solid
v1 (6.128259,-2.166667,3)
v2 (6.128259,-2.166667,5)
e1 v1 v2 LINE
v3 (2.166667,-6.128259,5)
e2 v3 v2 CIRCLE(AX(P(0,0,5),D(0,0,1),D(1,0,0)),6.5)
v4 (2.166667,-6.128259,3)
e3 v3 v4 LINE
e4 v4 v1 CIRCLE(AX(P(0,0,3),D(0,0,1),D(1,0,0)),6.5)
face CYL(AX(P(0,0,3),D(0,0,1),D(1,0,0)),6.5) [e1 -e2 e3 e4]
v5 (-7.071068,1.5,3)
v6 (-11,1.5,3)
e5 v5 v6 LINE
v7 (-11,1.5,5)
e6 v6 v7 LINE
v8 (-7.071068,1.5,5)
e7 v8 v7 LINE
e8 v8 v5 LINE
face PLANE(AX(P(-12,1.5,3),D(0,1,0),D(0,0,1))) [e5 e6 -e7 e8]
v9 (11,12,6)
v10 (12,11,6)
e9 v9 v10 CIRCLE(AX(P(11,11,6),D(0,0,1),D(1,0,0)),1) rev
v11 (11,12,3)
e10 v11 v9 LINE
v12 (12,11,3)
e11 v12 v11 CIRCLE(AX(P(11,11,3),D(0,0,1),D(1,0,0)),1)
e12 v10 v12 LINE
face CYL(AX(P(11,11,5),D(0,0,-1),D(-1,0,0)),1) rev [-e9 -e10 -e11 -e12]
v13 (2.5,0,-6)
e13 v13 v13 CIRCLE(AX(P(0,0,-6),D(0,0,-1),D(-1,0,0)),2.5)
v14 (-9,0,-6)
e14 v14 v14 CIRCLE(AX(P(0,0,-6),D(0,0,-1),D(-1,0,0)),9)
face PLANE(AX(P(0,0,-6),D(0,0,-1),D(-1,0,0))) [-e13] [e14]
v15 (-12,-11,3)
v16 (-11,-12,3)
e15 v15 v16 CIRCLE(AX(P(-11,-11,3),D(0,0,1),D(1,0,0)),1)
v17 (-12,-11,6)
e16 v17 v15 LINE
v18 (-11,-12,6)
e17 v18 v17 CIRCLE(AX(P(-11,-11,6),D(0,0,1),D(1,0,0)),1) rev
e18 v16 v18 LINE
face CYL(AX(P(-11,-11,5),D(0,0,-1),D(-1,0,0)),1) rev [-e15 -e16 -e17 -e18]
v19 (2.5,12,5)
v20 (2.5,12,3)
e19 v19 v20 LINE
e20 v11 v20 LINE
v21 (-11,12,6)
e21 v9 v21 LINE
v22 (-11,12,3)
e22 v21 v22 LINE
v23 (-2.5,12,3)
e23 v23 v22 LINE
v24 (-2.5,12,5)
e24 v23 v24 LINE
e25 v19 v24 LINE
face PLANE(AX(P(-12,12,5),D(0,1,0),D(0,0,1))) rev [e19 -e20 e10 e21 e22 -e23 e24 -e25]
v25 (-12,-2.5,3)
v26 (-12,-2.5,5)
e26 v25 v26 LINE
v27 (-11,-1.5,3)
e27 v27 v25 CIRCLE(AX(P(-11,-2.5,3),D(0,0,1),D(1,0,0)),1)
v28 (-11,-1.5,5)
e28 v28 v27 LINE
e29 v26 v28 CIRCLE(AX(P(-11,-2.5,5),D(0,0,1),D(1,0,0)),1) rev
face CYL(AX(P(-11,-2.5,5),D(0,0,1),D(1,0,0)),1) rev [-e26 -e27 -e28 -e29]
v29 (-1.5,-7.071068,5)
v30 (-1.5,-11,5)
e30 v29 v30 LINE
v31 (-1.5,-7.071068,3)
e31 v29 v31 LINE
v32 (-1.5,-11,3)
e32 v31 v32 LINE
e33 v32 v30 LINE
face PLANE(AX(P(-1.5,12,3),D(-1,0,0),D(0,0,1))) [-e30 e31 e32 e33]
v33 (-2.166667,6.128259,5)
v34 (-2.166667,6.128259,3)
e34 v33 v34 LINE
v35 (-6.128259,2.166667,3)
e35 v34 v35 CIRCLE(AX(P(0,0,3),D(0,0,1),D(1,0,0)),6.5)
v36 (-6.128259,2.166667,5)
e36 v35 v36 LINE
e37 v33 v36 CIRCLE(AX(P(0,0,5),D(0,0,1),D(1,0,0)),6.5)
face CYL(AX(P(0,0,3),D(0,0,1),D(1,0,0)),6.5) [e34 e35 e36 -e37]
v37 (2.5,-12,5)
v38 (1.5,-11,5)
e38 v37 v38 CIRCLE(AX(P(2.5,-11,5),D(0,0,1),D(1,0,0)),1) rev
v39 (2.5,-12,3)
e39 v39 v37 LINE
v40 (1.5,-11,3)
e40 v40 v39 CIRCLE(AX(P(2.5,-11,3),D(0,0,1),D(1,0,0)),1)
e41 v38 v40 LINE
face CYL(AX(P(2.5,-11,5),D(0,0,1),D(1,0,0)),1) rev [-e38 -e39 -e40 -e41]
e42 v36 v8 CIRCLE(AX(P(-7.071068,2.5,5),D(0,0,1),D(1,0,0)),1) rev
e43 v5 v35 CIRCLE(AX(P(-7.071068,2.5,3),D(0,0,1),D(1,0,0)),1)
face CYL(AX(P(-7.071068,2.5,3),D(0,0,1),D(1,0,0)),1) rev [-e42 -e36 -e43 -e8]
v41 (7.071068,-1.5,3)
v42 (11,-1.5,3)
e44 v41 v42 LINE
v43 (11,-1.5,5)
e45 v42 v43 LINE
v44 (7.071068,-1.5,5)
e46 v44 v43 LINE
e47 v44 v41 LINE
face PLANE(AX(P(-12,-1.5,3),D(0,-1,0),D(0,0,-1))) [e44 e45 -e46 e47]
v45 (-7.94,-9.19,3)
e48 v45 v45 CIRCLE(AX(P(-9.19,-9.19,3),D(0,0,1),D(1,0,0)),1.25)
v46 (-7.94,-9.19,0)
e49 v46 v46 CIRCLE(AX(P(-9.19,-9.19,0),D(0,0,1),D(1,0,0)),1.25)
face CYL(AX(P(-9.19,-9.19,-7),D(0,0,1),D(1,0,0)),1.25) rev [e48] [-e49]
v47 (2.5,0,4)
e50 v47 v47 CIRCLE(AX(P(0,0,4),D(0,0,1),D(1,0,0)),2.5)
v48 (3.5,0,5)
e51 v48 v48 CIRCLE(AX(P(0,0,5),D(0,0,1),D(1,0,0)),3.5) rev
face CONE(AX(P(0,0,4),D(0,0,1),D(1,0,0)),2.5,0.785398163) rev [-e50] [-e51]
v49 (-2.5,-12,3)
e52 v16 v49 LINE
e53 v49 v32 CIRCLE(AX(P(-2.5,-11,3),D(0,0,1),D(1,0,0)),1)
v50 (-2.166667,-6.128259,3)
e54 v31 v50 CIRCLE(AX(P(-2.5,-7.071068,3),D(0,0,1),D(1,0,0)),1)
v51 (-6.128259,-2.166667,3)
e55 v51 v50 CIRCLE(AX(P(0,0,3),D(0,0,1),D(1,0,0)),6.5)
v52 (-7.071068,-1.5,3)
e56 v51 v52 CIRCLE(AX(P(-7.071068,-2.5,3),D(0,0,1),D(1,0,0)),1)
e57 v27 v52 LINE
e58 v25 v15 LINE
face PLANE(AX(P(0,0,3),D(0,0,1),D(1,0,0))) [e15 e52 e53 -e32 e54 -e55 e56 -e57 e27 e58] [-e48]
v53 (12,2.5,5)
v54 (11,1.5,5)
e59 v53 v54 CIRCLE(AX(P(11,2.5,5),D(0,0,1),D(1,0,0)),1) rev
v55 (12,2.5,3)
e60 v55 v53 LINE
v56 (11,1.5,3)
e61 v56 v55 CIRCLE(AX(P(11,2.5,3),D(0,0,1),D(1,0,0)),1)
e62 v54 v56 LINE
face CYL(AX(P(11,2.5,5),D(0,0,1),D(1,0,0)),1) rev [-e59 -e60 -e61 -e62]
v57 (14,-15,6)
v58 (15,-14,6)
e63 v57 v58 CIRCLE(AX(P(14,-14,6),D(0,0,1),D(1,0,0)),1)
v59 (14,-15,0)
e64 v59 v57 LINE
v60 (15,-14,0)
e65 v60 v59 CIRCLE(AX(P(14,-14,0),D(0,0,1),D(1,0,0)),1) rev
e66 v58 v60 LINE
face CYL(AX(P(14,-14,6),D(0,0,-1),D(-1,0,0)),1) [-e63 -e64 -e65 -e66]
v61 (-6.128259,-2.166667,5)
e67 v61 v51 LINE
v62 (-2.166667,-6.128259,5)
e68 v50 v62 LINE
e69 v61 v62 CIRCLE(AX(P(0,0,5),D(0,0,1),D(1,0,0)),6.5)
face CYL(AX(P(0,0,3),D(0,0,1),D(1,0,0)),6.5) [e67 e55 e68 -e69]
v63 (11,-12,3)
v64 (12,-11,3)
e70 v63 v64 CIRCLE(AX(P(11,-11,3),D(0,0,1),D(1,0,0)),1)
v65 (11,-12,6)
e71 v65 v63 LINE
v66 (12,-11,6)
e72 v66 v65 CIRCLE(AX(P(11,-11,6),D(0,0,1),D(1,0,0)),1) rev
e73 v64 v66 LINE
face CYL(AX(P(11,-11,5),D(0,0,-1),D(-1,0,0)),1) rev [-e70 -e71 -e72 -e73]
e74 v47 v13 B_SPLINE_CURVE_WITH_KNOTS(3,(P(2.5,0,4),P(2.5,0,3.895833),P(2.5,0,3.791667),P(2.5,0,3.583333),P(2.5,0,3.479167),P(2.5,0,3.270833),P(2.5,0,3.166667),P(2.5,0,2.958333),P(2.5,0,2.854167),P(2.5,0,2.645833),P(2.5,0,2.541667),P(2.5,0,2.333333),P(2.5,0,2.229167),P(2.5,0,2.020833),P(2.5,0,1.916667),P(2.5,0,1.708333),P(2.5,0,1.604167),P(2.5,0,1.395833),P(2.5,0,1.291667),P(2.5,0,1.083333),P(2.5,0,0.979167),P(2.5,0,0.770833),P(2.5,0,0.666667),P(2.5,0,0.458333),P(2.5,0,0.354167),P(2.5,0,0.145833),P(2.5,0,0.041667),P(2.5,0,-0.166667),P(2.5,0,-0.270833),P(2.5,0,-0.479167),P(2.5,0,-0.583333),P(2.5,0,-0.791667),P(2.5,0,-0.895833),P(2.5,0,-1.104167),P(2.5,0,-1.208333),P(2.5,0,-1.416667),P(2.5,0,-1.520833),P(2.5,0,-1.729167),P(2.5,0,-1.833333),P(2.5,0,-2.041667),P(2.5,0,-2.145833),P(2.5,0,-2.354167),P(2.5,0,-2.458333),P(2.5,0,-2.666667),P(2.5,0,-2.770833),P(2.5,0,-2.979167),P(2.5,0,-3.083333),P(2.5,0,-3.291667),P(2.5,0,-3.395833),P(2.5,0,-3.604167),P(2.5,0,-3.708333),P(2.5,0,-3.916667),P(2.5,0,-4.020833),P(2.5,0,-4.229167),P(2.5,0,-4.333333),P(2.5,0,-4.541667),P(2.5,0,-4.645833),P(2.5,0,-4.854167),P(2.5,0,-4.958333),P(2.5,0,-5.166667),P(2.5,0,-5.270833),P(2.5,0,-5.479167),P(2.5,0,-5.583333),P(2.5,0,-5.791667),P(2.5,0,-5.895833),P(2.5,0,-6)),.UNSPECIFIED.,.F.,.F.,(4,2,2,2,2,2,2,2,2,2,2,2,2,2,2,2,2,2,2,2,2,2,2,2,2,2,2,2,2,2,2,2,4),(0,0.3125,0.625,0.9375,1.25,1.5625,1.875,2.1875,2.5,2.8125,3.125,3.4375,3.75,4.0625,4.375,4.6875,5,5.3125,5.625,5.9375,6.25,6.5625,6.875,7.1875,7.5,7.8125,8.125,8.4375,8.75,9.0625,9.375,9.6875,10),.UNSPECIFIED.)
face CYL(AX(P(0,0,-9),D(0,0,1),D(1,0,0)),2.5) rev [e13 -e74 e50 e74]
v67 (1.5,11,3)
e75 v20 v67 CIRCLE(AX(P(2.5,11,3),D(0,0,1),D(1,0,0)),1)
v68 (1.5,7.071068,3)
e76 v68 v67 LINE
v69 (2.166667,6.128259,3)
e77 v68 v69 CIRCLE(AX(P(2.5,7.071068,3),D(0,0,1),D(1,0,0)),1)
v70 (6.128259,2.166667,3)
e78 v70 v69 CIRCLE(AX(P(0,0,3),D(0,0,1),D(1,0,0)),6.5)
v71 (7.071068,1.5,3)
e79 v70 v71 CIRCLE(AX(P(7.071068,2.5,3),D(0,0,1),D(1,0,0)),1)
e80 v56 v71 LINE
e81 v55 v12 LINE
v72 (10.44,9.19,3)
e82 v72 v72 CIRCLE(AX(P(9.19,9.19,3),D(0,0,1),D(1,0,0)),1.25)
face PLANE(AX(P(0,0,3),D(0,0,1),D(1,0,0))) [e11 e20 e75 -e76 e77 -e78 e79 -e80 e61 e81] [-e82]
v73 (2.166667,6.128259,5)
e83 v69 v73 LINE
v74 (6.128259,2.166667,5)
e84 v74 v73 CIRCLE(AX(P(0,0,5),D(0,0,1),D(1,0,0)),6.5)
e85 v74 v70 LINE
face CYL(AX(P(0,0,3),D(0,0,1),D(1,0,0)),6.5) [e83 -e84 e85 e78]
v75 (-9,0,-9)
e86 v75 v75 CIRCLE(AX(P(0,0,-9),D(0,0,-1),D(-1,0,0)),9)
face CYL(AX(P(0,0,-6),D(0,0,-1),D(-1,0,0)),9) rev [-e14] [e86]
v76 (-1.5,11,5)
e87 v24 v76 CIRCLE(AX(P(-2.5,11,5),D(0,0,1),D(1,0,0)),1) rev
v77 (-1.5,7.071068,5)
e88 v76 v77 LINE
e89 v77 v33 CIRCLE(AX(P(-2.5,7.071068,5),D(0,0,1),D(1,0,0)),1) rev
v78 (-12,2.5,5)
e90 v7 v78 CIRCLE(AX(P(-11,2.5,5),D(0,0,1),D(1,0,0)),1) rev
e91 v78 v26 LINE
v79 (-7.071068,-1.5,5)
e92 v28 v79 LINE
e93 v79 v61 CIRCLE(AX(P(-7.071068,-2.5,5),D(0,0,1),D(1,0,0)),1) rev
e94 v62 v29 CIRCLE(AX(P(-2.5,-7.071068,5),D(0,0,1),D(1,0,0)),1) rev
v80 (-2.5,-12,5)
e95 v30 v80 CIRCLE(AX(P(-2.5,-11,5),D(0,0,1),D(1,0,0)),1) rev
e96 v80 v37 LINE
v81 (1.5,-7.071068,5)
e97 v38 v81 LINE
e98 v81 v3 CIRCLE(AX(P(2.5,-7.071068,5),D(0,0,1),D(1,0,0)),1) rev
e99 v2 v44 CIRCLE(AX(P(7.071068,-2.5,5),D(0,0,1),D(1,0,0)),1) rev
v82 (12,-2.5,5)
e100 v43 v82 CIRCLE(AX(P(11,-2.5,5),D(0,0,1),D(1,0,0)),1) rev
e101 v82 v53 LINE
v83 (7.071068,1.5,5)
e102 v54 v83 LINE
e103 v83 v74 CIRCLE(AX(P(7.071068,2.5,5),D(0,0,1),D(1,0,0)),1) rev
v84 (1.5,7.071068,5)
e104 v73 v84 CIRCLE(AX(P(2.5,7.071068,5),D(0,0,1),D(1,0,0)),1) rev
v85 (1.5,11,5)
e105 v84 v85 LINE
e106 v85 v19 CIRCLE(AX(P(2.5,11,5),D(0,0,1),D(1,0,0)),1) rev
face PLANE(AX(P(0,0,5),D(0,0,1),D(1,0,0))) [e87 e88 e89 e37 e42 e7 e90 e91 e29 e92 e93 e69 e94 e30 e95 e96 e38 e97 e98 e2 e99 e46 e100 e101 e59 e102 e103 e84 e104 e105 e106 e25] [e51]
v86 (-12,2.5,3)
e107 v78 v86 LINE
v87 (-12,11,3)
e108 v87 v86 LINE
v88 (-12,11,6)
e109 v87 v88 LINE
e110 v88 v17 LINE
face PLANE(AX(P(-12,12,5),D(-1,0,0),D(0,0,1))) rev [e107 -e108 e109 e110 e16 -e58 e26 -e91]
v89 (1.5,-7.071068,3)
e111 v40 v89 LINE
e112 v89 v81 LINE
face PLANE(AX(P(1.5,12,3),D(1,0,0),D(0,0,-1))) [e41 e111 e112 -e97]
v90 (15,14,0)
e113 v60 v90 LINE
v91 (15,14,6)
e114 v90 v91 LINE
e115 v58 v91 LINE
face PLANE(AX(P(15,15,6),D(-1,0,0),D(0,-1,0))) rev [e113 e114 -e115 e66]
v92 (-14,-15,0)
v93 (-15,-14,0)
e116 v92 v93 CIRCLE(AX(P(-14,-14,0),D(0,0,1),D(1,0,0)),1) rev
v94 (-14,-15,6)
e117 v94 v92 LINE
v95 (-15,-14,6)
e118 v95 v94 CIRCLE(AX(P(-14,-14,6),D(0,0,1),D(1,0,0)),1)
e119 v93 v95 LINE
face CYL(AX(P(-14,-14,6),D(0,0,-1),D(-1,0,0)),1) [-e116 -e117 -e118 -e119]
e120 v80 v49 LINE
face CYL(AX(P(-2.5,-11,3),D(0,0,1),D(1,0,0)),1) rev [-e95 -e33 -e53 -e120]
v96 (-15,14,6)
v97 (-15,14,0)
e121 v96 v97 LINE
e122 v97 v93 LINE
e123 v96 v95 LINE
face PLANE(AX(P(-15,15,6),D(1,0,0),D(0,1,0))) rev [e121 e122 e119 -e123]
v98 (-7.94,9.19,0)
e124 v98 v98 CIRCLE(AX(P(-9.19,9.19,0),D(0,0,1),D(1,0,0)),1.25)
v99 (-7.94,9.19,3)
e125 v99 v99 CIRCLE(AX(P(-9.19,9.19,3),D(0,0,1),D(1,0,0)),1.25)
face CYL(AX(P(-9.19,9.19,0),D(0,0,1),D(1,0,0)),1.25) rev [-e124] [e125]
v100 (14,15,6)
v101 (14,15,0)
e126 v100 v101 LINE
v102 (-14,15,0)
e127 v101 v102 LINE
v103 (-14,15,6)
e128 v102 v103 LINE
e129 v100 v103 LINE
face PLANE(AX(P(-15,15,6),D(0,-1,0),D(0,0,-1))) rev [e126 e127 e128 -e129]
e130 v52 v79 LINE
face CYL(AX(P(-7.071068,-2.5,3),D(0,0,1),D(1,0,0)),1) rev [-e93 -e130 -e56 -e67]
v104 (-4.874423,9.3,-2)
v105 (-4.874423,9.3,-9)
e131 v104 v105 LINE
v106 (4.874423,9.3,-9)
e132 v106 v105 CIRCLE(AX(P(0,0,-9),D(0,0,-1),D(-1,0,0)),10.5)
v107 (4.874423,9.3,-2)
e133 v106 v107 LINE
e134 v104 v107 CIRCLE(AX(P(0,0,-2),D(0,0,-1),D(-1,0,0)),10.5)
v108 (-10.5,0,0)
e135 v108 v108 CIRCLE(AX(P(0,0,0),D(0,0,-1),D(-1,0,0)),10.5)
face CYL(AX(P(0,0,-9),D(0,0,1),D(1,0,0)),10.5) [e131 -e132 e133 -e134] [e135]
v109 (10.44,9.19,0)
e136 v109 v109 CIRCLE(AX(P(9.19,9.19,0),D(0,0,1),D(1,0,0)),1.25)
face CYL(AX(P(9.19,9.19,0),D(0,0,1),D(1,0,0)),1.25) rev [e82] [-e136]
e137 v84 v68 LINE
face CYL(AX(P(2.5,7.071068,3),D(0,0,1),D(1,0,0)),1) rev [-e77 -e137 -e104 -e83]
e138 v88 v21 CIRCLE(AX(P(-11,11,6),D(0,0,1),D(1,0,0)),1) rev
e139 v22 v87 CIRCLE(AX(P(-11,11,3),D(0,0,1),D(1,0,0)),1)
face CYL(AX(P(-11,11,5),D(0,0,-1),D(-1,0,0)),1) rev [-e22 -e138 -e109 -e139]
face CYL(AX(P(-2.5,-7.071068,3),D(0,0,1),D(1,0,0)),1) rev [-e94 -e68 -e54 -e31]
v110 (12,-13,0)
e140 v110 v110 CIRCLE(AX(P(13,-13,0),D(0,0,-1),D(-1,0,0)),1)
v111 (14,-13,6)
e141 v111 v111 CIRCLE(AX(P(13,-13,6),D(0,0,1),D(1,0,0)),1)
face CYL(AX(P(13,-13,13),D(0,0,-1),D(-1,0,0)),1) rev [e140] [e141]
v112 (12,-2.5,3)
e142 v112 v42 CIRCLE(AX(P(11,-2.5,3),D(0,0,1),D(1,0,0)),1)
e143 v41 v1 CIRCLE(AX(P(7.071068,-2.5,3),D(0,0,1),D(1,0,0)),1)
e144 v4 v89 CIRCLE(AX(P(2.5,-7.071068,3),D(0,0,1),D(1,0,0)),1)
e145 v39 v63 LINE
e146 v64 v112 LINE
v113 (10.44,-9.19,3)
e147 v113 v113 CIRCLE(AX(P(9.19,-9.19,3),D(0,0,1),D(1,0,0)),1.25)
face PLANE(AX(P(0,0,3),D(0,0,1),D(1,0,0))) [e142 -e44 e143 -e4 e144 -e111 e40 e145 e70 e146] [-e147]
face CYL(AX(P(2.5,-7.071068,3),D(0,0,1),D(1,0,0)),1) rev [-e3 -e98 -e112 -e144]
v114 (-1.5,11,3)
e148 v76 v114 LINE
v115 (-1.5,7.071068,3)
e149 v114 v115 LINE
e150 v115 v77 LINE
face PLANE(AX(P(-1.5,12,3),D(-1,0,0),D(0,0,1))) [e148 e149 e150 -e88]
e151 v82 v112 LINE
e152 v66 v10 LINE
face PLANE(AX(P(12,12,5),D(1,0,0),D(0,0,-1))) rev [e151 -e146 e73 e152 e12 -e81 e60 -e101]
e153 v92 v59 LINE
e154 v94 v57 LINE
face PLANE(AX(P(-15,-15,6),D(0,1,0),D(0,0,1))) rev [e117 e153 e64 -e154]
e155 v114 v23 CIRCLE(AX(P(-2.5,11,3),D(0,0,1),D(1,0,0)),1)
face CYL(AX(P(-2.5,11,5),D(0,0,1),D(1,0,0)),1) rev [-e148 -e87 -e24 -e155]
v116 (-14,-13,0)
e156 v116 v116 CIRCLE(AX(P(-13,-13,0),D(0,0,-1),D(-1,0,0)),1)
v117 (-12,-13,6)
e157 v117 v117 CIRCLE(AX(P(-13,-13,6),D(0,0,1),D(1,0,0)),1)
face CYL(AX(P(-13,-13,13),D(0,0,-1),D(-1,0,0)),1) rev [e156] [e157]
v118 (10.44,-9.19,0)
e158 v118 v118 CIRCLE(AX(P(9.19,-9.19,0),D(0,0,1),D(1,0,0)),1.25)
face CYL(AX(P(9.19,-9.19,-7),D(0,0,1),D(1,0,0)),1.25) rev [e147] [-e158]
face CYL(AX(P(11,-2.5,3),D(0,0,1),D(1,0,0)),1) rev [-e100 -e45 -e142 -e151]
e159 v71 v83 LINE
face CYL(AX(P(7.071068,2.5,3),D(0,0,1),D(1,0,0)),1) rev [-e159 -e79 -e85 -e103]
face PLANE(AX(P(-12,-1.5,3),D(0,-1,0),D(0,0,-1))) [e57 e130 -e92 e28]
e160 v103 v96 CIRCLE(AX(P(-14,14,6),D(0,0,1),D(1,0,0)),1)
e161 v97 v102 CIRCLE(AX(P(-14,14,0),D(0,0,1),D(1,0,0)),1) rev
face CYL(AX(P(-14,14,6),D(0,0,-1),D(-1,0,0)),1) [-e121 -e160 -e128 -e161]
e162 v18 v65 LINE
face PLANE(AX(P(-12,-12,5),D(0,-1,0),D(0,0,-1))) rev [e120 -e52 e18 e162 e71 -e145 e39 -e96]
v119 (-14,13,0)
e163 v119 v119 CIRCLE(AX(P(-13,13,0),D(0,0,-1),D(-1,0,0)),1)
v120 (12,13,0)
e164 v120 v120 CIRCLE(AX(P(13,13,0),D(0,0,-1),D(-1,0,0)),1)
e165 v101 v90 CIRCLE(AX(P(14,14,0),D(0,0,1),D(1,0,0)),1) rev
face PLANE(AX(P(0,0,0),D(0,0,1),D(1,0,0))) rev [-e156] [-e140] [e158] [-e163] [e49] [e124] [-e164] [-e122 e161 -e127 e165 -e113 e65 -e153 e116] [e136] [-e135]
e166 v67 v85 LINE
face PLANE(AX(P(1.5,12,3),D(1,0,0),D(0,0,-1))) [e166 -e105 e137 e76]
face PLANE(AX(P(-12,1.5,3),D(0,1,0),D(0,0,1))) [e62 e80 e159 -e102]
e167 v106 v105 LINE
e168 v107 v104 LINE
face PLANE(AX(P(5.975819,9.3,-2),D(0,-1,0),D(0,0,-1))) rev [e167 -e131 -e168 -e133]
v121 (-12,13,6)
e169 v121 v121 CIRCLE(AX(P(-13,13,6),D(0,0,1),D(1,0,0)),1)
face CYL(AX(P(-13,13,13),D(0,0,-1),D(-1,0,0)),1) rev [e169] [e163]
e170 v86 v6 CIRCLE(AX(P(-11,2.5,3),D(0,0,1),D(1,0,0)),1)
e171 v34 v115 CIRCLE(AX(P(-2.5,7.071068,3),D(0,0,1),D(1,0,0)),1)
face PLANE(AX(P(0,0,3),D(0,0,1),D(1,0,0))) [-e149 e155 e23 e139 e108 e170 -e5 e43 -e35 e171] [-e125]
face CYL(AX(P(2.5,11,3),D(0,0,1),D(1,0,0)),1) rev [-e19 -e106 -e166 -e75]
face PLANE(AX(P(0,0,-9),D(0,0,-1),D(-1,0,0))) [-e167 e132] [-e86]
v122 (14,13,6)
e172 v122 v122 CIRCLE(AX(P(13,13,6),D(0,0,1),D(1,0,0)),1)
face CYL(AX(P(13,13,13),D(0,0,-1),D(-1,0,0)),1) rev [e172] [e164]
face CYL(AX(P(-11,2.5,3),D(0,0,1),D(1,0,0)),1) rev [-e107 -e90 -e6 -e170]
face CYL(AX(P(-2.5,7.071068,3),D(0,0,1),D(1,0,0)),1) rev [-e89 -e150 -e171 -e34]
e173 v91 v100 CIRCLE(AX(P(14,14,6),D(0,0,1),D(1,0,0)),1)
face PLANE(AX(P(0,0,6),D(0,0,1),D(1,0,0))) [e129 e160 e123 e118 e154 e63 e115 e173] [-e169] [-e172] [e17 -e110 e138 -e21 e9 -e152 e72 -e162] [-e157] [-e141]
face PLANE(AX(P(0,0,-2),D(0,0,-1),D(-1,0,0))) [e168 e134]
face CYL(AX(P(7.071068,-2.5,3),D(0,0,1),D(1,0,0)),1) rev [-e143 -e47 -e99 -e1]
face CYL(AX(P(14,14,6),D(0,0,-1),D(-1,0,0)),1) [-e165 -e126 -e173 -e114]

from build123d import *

# Parameters (mm, degrees)
SKETCH2_W              = 30
SKETCH2_H              = 30
BOSS_EXTRUDE1_DEPTH    = 6
CUT_EXTRUDE1_START     = -1
CUT_EXTRUDE1_OUTLINE_W = 24
CUT_EXTRUDE1_OUTLINE_H = 24
CUT_EXTRUDE1_DEPTH     = 1
SKETCH4_W              = 24
SKETCH4_H              = 24
SKETCH4_R              = 6.5
CUT_EXTRUDE2_DEPTH     = 2
SKETCH5_W              = 3
SKETCH5_H              = 24
BOSS_EXTRUDE2_DEPTH    = 2
SKETCH6_W              = 24
SKETCH6_H              = 3
BOSS_EXTRUDE3_DEPTH    = 2
FILLET1_R              = 1
FILLET2_R              = 1
SKETCH8_R              = 1.25
CUT_EXTRUDE3_DEPTH     = 10
SKETCH7_R              = 1.25
CUT_EXTRUDE4_DEPTH     = 6
FILLET3_R              = 1
SKETCH10_R             = 10.5
BOSS_EXTRUDE4_DEPTH    = 9
SKETCH11_R             = 9
CUT_EXTRUDE5_DEPTH     = 3
SKETCH9_R              = 2.5
CUT_EXTRUDE6_DEPTH     = 26.416530054
SKETCH12_R             = 1
CUT_EXTRUDE7_DEPTH     = 13
SKETCH13_W             = 15.514513233
SKETCH13_H             = 2.095553254
CUT_EXTRUDE9_DEPTH     = 7
CHAMFER1_SIZE          = 1


# Read off the part's stored shape, not the designer's step: Cut-Extrude1
with BuildPart() as part:
    # Sketch2 → Boss-Extrude1 (new body)
    with BuildSketch(Plane.XY):
        Rectangle(SKETCH2_W, SKETCH2_H)
    extrude(amount=BOSS_EXTRUDE1_DEPTH)

    # Cut-Extrude1 outline → Cut-Extrude1 (cut)
    with BuildSketch(Plane.XY.offset(6).offset(CUT_EXTRUDE1_START)):
        Rectangle(CUT_EXTRUDE1_OUTLINE_W, CUT_EXTRUDE1_OUTLINE_H)
    extrude(amount=CUT_EXTRUDE1_DEPTH, mode=Mode.SUBTRACT)

    # Sketch4 → Cut-Extrude2 (cut)
    with BuildSketch(Plane.XY.offset(5)):
        Rectangle(SKETCH4_W, SKETCH4_H)
        Circle(SKETCH4_R, mode=Mode.SUBTRACT)
    extrude(amount=-CUT_EXTRUDE2_DEPTH, mode=Mode.SUBTRACT)

    # Sketch5 → Boss-Extrude2 (add)
    with BuildSketch(Plane.XY.offset(5)):
        Rectangle(SKETCH5_W, SKETCH5_H)
    extrude(amount=-BOSS_EXTRUDE2_DEPTH)

    # Sketch6 → Boss-Extrude3 (add)
    with BuildSketch(Plane.XY.offset(5)):
        Rectangle(SKETCH6_W, SKETCH6_H)
    extrude(amount=-BOSS_EXTRUDE3_DEPTH)

    # Fillet1
    fillet1_edges = [part.edges().sort_by_distance(p)[0] for p in [
        (1.5, 6.32455532, 4),
        (-1.5, -6.32455532, 4),
        (1.5, -6.32455532, 4),
        (-1.5, 6.32455532, 4),
        (6.32455532, -1.5, 4),
        (6.32455532, 1.5, 4),
        (-6.32455532, -1.5, 4),
        (-6.32455532, 1.5, 4),
    ]]
    fillet(fillet1_edges, radius=FILLET1_R)

    # Fillet2
    fillet2_edges = [part.edges().sort_by_distance(p)[0] for p in [
        (12, 12, 4.5),
        (12, -12, 4.5),
        (-12, -12, 4.5),
        (-12, 12, 4.5),
        (1.5, 12, 4),
        (-1.5, -12, 4),
        (1.5, -12, 4),
        (-1.5, 12, 4),
        (12, -1.5, 4),
        (12, 1.5, 4),
        (-12, -1.5, 4),
        (-12, 1.5, 4),
    ]]
    fillet(fillet2_edges, radius=FILLET2_R)

    # Sketch8 → Cut-Extrude3 (cut)
    with BuildSketch(Plane.XY.offset(3)):
        with Locations((-9.19, -9.19)):
            Circle(SKETCH8_R)
        with Locations((9.19, -9.19)):
            Circle(SKETCH8_R)
    extrude(amount=-CUT_EXTRUDE3_DEPTH, mode=Mode.SUBTRACT)

    # Sketch7 → Cut-Extrude4 (cut)
    with BuildSketch(Plane.XY.offset(6)):
        with Locations((-9.19, 9.19)):
            Circle(SKETCH7_R)
        with Locations((9.19, 9.19)):
            Circle(SKETCH7_R)
    extrude(amount=-CUT_EXTRUDE4_DEPTH, mode=Mode.SUBTRACT)

    # Fillet3
    fillet3_edges = [part.edges().sort_by_distance(p)[0] for p in [
        (15, -15, 3),
        (-15, -15, 3),
        (-15, 15, 3),
        (15, 15, 3),
    ]]
    fillet(fillet3_edges, radius=FILLET3_R)

    # Sketch10 → Boss-Extrude4 (add)
    with BuildSketch(Plane(origin=(0, 0, 0), x_dir=(-1, 0, 0), z_dir=(0, 0, -1))):
        Circle(SKETCH10_R)
    extrude(amount=BOSS_EXTRUDE4_DEPTH)

    # Sketch11 → Cut-Extrude5 (cut)
    with BuildSketch(Plane(origin=(0, 0, -9), x_dir=(-1, 0, 0), z_dir=(0, 0, -1))):
        Circle(SKETCH11_R)
    extrude(amount=-CUT_EXTRUDE5_DEPTH, mode=Mode.SUBTRACT)

    # Sketch9 → Cut-Extrude6 (cut, through all)
    with BuildSketch(Plane.XY.offset(5)):
        Circle(SKETCH9_R)
    extrude(amount=-CUT_EXTRUDE6_DEPTH, mode=Mode.SUBTRACT)

    # Sketch12 → Cut-Extrude7 (cut)
    with BuildSketch(Plane(origin=(0, 0, 0), x_dir=(-1, 0, 0), z_dir=(0, 0, -1))):
        with Locations((13, 13)):
            Circle(SKETCH12_R)
        with Locations((-13, 13)):
            Circle(SKETCH12_R)
        with Locations((-13, -13)):
            Circle(SKETCH12_R)
        with Locations((13, -13)):
            Circle(SKETCH12_R)
    extrude(amount=-CUT_EXTRUDE7_DEPTH, mode=Mode.SUBTRACT)

    # Sketch13 → Cut-Extrude9 (cut)
    with BuildSketch(Plane(origin=(0, 0, -9), x_dir=(-1, 0, 0), z_dir=(0, 0, -1))):
        with Locations((1.781437306, 10.347776627)):
            Rectangle(SKETCH13_W, SKETCH13_H)
    extrude(amount=-CUT_EXTRUDE9_DEPTH, mode=Mode.SUBTRACT)

    # Chamfer1
    chamfer1_edges = [part.edges().sort_by_distance(p)[0] for p in [
        (-2.5, 0, 5),
    ]]
    chamfer(chamfer1_edges, length=CHAMFER1_SIZE)


solid = part.part
